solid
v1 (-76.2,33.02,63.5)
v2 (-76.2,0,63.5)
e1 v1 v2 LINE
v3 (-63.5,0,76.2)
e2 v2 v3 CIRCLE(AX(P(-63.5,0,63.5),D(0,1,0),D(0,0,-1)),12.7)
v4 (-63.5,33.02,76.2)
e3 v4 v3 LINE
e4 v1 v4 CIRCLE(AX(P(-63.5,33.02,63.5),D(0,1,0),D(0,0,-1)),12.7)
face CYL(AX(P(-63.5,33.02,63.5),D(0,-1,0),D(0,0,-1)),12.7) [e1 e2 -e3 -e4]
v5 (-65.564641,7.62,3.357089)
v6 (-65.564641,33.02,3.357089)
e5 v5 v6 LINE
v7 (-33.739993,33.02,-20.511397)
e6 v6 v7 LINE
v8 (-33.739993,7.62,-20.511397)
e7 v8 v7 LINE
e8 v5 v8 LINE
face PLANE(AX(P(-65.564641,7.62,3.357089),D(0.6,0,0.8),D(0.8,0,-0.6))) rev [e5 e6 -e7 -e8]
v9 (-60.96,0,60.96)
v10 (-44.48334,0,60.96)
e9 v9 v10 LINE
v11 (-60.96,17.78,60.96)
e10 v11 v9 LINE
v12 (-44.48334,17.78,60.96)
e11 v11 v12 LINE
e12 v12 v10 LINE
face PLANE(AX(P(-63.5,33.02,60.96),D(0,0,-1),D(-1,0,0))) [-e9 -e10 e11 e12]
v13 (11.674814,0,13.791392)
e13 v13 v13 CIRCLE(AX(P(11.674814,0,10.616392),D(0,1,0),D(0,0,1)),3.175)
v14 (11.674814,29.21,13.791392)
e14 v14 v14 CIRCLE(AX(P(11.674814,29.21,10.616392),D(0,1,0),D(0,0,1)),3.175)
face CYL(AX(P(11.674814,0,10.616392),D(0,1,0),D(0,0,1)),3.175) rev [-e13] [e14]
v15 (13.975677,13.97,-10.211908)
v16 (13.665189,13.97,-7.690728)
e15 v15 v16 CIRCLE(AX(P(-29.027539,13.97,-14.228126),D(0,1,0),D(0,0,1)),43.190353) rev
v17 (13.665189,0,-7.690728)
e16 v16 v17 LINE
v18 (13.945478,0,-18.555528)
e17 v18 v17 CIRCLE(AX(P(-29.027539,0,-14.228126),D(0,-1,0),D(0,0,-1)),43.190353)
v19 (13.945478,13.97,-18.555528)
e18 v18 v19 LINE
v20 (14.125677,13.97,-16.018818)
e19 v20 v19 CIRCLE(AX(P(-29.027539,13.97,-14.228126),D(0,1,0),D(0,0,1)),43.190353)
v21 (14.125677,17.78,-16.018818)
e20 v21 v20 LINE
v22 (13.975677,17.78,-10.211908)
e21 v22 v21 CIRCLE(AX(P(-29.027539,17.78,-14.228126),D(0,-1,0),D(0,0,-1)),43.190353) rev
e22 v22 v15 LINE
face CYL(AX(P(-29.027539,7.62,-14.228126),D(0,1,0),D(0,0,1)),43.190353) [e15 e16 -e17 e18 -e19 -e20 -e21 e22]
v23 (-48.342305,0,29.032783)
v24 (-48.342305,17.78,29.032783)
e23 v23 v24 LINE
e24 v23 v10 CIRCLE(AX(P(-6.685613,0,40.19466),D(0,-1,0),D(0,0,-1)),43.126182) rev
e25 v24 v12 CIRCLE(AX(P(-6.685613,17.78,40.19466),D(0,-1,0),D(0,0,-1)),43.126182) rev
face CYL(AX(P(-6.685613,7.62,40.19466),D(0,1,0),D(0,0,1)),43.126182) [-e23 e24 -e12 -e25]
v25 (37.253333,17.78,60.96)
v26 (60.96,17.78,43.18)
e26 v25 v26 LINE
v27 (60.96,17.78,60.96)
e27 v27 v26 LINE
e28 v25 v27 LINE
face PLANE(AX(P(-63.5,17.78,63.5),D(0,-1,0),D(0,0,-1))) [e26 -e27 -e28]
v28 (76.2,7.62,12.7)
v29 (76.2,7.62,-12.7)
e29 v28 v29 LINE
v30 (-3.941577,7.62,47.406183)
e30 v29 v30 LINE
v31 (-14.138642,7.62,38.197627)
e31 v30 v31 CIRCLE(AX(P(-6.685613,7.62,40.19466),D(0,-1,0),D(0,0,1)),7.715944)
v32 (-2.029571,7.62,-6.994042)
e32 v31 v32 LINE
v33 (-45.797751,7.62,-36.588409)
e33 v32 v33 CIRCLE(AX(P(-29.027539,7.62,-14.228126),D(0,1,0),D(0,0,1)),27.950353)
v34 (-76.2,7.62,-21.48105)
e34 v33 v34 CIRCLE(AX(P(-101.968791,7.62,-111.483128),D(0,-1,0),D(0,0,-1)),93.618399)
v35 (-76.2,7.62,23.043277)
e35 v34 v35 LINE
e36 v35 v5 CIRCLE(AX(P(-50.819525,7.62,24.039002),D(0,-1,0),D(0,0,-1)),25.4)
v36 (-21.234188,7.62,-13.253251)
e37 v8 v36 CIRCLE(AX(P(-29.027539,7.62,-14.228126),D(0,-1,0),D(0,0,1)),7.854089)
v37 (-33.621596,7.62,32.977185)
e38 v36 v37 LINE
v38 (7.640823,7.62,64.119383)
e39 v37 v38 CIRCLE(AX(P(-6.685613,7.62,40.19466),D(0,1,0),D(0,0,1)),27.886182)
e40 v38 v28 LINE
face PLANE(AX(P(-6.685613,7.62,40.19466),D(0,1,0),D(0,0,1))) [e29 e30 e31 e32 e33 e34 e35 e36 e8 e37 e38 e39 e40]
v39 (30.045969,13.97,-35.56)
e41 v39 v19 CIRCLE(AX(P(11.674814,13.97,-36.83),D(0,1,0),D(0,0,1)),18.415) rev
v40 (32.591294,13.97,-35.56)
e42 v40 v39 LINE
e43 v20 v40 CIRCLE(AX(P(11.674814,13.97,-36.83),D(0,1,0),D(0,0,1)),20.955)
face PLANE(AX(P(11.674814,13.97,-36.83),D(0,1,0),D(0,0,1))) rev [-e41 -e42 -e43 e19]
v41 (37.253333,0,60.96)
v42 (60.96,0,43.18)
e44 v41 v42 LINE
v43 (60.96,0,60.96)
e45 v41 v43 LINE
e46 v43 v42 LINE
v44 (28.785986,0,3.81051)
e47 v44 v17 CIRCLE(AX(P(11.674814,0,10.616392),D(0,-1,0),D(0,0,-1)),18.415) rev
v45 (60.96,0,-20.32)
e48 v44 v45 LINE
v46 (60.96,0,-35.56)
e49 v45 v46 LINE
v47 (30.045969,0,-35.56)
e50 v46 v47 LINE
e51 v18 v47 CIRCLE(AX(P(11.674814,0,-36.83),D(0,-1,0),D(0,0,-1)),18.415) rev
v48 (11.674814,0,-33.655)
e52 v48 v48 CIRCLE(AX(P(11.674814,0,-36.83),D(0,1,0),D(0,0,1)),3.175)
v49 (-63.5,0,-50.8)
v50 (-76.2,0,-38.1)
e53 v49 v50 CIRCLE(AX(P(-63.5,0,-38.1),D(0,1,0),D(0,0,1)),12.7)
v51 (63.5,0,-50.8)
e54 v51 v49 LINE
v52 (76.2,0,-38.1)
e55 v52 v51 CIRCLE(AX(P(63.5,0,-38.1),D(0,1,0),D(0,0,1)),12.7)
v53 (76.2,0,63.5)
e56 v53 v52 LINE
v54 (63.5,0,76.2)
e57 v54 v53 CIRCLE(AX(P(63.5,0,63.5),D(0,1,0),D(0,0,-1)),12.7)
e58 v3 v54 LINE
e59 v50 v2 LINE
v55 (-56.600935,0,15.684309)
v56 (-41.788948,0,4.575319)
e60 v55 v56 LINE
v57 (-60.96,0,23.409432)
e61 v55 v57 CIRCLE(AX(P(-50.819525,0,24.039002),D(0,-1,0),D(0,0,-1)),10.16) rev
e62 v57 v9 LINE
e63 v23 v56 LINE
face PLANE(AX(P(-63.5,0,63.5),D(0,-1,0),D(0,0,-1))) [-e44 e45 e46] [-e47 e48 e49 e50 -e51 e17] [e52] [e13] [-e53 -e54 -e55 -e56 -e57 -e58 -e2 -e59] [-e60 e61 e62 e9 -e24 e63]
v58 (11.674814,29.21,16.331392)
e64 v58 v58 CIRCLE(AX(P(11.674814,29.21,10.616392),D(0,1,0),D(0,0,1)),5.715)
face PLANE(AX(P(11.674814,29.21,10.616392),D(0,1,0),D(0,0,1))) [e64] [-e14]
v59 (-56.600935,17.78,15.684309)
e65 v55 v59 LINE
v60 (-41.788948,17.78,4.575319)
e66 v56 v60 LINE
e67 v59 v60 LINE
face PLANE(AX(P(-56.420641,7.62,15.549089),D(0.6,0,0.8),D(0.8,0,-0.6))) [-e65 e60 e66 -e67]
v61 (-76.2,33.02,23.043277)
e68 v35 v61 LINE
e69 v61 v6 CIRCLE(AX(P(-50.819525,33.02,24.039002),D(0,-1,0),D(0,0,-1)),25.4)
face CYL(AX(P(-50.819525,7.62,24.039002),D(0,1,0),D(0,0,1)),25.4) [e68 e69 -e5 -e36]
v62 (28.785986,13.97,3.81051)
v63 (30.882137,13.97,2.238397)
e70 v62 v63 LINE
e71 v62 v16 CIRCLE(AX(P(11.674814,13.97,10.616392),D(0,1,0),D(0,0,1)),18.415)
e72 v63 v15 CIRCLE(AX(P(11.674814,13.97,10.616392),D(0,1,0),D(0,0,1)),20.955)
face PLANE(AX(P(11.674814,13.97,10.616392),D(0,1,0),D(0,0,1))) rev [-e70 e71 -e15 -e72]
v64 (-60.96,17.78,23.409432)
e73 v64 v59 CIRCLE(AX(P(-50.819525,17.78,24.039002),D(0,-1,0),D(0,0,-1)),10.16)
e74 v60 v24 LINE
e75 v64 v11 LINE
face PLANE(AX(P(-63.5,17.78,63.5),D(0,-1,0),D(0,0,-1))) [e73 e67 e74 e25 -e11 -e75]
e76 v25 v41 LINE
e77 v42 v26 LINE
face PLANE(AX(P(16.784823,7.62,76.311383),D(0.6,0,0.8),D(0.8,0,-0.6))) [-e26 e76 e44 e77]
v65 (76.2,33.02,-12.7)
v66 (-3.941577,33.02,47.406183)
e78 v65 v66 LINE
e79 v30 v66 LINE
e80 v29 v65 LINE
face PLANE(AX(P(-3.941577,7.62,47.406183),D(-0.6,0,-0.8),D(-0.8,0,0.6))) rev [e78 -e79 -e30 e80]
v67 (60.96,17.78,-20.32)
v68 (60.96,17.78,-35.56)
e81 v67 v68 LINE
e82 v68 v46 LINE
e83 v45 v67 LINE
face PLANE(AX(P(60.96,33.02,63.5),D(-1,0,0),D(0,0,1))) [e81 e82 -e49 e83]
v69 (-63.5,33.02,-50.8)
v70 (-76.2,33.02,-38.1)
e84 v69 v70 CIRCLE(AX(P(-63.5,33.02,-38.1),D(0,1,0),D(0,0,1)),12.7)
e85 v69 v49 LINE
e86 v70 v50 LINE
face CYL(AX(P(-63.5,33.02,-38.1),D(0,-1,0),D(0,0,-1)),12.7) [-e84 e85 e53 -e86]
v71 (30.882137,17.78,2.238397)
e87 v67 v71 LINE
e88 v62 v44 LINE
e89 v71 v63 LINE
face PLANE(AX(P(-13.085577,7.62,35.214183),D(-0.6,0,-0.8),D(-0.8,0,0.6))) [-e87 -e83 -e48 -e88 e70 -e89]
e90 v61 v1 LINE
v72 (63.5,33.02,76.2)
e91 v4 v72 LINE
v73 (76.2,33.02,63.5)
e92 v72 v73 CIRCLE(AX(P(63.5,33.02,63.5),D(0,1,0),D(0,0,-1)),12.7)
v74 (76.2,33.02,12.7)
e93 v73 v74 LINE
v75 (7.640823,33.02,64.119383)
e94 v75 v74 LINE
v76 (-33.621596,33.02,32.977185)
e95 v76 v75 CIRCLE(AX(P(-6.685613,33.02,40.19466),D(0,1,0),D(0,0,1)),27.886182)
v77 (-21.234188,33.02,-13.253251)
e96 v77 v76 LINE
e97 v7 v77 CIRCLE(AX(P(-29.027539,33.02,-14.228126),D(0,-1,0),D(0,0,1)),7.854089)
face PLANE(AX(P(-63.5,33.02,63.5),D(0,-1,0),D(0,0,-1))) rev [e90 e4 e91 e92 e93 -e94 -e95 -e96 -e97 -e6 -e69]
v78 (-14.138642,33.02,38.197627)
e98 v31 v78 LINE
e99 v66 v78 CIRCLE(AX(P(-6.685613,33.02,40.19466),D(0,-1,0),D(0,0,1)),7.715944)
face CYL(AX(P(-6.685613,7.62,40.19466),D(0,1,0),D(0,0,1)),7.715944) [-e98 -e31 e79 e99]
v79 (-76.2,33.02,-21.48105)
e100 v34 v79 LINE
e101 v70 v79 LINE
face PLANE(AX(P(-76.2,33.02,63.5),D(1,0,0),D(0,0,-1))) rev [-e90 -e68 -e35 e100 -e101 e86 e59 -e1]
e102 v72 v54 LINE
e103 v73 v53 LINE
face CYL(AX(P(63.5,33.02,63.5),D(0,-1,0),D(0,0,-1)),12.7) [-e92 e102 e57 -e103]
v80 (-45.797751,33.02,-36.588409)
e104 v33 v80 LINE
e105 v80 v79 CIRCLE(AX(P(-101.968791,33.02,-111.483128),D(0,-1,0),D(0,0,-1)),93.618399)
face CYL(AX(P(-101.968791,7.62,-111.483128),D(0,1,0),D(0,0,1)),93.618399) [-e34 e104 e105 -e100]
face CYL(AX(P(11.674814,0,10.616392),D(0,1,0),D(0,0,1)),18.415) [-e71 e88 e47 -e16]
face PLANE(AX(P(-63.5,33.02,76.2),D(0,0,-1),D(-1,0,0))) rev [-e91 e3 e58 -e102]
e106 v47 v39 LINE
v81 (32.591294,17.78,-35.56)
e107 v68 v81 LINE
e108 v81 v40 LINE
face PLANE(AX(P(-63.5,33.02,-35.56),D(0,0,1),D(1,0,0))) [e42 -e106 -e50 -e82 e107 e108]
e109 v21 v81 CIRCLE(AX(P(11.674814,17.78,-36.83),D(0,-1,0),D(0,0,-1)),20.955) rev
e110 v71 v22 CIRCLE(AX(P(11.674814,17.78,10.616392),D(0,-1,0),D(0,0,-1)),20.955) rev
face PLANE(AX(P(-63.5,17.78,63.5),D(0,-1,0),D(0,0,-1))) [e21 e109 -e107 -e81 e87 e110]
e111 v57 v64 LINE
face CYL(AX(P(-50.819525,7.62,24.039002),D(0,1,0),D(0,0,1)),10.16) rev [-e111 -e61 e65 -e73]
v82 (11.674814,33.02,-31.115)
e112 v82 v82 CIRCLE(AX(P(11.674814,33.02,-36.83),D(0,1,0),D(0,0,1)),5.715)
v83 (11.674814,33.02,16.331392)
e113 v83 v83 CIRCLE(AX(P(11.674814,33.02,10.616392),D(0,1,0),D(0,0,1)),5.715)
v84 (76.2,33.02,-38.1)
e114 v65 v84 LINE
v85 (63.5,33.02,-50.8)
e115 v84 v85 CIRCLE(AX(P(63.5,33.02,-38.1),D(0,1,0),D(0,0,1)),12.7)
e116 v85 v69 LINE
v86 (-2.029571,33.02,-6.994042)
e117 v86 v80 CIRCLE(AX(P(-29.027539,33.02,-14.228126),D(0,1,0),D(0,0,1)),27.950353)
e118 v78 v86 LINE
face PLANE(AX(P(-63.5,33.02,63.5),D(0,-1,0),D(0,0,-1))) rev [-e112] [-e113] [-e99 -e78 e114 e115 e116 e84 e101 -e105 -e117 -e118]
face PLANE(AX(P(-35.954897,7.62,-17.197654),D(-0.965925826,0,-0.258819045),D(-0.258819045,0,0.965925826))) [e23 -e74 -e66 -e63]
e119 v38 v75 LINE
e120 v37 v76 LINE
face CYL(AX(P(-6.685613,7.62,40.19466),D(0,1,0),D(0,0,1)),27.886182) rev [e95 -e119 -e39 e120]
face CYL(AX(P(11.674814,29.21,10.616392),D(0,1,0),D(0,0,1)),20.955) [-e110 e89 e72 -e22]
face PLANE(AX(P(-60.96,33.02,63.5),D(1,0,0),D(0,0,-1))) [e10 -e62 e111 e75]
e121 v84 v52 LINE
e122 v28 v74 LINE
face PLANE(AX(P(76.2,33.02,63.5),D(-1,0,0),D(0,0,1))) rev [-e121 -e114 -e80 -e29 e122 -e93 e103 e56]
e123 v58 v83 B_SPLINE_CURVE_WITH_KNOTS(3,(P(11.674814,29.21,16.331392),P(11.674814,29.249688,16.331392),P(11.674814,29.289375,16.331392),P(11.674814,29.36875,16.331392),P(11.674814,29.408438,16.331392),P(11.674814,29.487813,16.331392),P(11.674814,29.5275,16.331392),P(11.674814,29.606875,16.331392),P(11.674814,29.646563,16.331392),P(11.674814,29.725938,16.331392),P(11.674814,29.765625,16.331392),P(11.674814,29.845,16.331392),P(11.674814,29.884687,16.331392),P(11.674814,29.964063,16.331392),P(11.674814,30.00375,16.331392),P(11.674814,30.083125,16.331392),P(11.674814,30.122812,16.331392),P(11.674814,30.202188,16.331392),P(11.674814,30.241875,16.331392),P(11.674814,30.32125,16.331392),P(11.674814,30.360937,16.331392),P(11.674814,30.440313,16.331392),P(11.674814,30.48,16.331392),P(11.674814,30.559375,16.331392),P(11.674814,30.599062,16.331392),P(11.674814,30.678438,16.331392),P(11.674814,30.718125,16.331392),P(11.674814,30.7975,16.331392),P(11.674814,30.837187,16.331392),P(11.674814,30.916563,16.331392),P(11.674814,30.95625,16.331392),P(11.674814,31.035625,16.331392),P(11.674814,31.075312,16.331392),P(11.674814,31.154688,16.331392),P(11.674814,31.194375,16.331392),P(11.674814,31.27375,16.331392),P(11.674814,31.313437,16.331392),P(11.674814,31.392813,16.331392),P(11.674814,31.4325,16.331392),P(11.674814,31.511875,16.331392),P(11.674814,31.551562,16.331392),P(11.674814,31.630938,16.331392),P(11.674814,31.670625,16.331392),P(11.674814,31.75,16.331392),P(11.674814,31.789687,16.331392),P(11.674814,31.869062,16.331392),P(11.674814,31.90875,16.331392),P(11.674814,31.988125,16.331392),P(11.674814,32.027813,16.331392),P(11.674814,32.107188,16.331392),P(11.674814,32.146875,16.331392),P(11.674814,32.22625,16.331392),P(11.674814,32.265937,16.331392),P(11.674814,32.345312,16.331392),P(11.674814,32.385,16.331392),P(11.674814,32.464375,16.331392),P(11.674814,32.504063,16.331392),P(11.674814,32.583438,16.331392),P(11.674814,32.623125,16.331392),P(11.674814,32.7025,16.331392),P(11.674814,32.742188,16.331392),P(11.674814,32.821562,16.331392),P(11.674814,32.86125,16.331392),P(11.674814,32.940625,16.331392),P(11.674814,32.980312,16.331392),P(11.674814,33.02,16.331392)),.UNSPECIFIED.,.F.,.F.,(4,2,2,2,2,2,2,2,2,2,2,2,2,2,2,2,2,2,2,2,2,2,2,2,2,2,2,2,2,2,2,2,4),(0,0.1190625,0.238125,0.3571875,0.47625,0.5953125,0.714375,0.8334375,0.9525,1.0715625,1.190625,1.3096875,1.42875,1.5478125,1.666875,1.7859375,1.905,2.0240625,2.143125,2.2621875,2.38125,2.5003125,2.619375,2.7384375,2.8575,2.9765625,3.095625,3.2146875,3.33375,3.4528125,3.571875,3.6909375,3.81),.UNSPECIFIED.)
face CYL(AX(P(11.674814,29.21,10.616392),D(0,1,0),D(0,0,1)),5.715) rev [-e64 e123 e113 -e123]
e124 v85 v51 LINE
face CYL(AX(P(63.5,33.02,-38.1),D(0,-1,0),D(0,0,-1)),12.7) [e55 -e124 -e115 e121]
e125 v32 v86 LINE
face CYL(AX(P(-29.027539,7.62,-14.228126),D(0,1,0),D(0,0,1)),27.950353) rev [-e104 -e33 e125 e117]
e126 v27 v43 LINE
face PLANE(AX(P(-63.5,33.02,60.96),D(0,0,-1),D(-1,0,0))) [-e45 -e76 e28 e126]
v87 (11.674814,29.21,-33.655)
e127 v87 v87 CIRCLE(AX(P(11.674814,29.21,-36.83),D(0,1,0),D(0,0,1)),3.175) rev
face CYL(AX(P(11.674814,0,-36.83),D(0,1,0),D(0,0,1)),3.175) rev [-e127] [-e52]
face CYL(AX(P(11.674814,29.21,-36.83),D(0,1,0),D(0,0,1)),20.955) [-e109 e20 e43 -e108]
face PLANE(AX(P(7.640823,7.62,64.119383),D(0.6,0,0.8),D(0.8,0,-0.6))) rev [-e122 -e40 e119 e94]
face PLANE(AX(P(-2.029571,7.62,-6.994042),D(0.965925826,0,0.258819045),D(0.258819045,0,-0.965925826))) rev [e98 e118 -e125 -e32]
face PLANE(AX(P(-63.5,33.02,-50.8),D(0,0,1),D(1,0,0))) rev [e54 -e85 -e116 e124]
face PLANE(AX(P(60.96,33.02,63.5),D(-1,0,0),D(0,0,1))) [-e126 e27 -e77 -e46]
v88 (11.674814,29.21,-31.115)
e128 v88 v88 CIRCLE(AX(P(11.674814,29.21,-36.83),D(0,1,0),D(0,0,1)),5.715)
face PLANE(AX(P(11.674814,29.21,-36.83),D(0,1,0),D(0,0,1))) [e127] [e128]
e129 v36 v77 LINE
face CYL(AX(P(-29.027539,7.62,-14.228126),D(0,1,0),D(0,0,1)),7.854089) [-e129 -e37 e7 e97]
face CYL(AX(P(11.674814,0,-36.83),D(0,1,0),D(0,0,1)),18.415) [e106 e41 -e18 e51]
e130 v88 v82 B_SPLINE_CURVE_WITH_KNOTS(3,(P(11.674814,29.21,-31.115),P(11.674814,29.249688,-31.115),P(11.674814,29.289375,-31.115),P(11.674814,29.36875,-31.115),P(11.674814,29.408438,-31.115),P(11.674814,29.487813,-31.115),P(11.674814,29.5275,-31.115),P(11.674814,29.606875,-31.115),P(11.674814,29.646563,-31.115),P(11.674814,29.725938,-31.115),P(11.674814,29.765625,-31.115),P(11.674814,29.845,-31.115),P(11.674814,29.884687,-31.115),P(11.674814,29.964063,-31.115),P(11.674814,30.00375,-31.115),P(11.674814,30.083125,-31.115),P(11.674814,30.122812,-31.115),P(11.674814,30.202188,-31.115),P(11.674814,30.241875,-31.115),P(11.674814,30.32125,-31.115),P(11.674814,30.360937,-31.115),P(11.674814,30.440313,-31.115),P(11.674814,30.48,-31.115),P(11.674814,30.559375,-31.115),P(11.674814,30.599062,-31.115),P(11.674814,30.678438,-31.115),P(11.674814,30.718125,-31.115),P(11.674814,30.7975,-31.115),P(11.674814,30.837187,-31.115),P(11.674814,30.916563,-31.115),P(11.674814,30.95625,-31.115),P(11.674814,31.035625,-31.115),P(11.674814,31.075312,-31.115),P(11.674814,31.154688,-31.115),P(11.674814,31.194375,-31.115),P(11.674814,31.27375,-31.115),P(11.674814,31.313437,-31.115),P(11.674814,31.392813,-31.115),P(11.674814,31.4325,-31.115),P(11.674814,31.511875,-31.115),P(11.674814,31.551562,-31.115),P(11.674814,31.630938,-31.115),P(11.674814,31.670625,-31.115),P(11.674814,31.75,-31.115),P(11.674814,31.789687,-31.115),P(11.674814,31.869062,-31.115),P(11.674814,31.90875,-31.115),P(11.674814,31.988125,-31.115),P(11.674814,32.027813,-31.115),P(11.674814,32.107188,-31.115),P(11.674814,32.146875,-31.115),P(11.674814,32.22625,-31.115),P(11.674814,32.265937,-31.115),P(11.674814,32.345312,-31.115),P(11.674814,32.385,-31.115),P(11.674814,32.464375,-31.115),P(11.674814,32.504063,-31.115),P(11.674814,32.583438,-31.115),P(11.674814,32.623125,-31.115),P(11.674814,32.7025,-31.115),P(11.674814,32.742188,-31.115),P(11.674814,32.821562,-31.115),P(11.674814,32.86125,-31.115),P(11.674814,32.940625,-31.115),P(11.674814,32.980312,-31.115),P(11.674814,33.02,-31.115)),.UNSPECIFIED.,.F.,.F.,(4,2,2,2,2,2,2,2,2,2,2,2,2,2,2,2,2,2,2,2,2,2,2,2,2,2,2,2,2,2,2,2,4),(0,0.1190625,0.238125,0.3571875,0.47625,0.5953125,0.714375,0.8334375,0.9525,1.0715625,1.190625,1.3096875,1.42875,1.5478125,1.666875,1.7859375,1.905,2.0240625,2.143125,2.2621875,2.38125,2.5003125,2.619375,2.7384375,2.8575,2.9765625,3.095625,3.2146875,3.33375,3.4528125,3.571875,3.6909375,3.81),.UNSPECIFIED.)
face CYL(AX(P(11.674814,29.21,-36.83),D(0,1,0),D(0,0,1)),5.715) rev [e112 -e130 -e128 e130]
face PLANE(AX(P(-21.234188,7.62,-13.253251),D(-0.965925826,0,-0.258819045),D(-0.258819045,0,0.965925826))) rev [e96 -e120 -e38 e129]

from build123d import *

# Parameters (mm, degrees)
BOSS_EXTRUDE1_DEPTH = 33.02
CUT_EXTRUDE1_DEPTH  = 25.4
SKETCH3_R           = 3.175
CUT_EXTRUDE2_DEPTH  = 113.70847528
SKETCH4_R           = 5.715
SKETCH4_R_2         = 3.175
CUT_EXTRUDE3_DEPTH  = 3.81
SHELL4_DEPTH        = 17.78
SHELL4_2_DEPTH      = 13.97


# Read off the part's stored shape, not the designer's step: Shell4
with BuildPart() as part:
    # Sketch1 → Boss-Extrude1 (new body)
    with BuildSketch(Plane(origin=(0, 0, 0), x_dir=(1, 0, 0), z_dir=(0, 1, 0))):
        with BuildLine():
            Line((-63.5, -76.2), (63.5, -76.2))
            ThreePointArc((63.5, -76.2), (72.480256121, -72.480256121), (76.2, -63.5))
            Line((76.2, -63.5), (76.2, 38.1))
            ThreePointArc((76.2, 38.1), (72.480256121, 47.080256121), (63.5, 50.8))
            Line((63.5, 50.8), (-63.5, 50.8))
            ThreePointArc((-63.5, 50.8), (-72.480256121, 47.080256121), (-76.2, 38.1))
            Line((-76.2, 38.1), (-76.2, -63.5))
            ThreePointArc((-76.2, -63.5), (-72.480256121, -72.480256121), (-63.5, -76.2))
        make_face()
    extrude(amount=BOSS_EXTRUDE1_DEPTH)

    # Sketch2 → Cut-Extrude1 (cut)
    with BuildSketch(Plane(origin=(0, 33.02, 0), x_dir=(1, 0, 0), z_dir=(0, 1, 0))):
        with BuildLine():
            Line((-21.234187682, 13.253251383), (-33.621595815, -32.977185142))
            ThreePointArc((-33.621595815, -32.977185142), (-23.484698626, -62.452913285), (7.640823288, -64.119382534))
            Line((7.640823288, -64.119382534), (76.2, -12.7))
            Line((76.2, -12.7), (76.2, 12.7))
            Line((76.2, 12.7), (-3.941576712, -47.406182534))
            ThreePointArc((-3.941576712, -47.406182534), (-11.856979187, -45.921156496), (-14.138642435, -38.197626766))
            Line((-14.138642435, -38.197626766), (-2.029571171, 6.994042425))
            ThreePointArc((-2.029571171, 6.994042425), (-13.371601822, 37.382259223), (-45.797751473, 36.588408962))
            ThreePointArc((-45.797751473, 36.588408962), (-60.308353779, 27.645114035), (-76.2, 21.481050133))
            Line((-76.2, 21.481050133), (-76.2, -23.043277433))
            ThreePointArc((-76.2, -23.043277433), (-73.166835121, -11.965986434), (-65.564641264, -3.357089081))
            Line((-65.564641264, -3.357089081), (-33.739992737, 20.511397314))
            ThreePointArc((-33.739992737, 20.511397314), (-25.085058678, 21.02103117), (-21.234187682, 13.253251383))
        make_face()
    extrude(amount=-CUT_EXTRUDE1_DEPTH, mode=Mode.SUBTRACT)

    # Sketch3 → Cut-Extrude2 (cut, through all)
    with BuildSketch(Plane(origin=(0, 33.02, 0), x_dir=(1, 0, 0), z_dir=(0, 1, 0))):
        with Locations(Location((11.674814186, 36.83, 0), (0, 0, 270))):
            Circle(SKETCH3_R)
        with Locations(Location((11.674814186, -10.616391667, 0), (0, 0, 270))):
            Circle(SKETCH3_R)
    extrude(amount=-CUT_EXTRUDE2_DEPTH, mode=Mode.SUBTRACT)

    # Sketch4 → Cut-Extrude3 (cut)
    # profile 1 of 2: a face of its own
    with BuildSketch(Plane(origin=(0, 33.02, 0), x_dir=(1, 0, 0), z_dir=(0, 1, 0))):
        with Locations(Location((11.674814186, 36.83, 0), (0, 0, 270))):
            Circle(SKETCH4_R)
    # profile 2 of 2: a face of its own
    with BuildSketch(Plane(origin=(0, 33.02, 0), x_dir=(1, 0, 0), z_dir=(0, 1, 0))):
        with Locations(Location((11.674814186, -10.616391667, 0), (0, 0, 270))):
            Circle(SKETCH4_R)
        with Locations(Location((11.674814186, -10.616391667, 0), (0, 0, 270))):
            Circle(SKETCH4_R_2, mode=Mode.SUBTRACT)
    extrude(amount=-CUT_EXTRUDE3_DEPTH, mode=Mode.SUBTRACT)

    # Shell4 outline → Shell4 (cut)
    with BuildSketch(Plane(origin=(0, 0, 0), x_dir=(1, 0, 0), z_dir=(0, 1, 0))):
        with BuildLine():
            Line((-41.788947679, -4.575318892), (-56.600935015, -15.684309395))
            ThreePointArc((-56.600935015, -15.684309395), (-59.668026883, -19.046046541), (-60.96, -23.409432225))
            Line((-60.96, -23.409432225), (-60.96, -60.96))
            Line((-60.96, -60.96), (-44.483340176, -60.96))
            ThreePointArc((-44.483340176, -60.96), (-49.500189899, -45.369554015), (-48.342305407, -29.032782895))
            Line((-48.342305407, -29.032782895), (-41.788947679, -4.575318892))
        make_face()
        Polygon((37.253333333, -60.96), (60.96, -60.96), (60.96, -43.18), align=None)
        with BuildLine():
            ThreePointArc((13.975676971, 10.211907722), (24.100715908, 6.256930217), (30.882136703, -2.238397473))
            Line((30.882136703, -2.238397473), (60.96, 20.32))
            Line((60.96, 20.32), (60.96, 35.56))
            Line((60.96, 35.56), (32.591293933, 35.56))
            ThreePointArc((32.591293933, 35.56), (26.905461548, 22.437661554), (14.125676613, 16.018817949))
            ThreePointArc((14.125676613, 16.018817949), (14.148411798, 13.11283822), (13.975676971, 10.211907722))
        make_face()
    extrude(amount=SHELL4_DEPTH, mode=Mode.SUBTRACT)

    # Shell4 2 outline → Shell4 2 (cut)
    with BuildSketch(Plane(origin=(0, 0, 0), x_dir=(1, 0, 0), z_dir=(0, 1, 0))):
        with BuildLine():
            Line((28.785986128, -3.810510404), (30.882136703, -2.238397473))
            ThreePointArc((30.882136703, -2.238397473), (24.100715908, 6.256930217), (13.975676971, 10.211907722))
            ThreePointArc((13.975676971, 10.211907722), (13.838972267, 8.949034749), (13.66518896, 7.690728075))
            ThreePointArc((13.66518896, 7.690728075), (22.823217362, 4.040529279), (28.785986128, -3.810510404))
        make_face()
        with BuildLine():
            ThreePointArc((13.945477939, 18.555528431), (14.054251914, 17.288499768), (14.125676613, 16.018817949))
            ThreePointArc((14.125676613, 16.018817949), (26.905461548, 22.437661554), (32.591293933, 35.56))
            Line((32.591293933, 35.56), (30.045968886, 35.56))
            ThreePointArc((30.045968886, 35.56), (25.046769189, 24.168916144), (13.945477939, 18.555528431))
        make_face()
    extrude(amount=SHELL4_2_DEPTH, mode=Mode.SUBTRACT)


solid = part.part
